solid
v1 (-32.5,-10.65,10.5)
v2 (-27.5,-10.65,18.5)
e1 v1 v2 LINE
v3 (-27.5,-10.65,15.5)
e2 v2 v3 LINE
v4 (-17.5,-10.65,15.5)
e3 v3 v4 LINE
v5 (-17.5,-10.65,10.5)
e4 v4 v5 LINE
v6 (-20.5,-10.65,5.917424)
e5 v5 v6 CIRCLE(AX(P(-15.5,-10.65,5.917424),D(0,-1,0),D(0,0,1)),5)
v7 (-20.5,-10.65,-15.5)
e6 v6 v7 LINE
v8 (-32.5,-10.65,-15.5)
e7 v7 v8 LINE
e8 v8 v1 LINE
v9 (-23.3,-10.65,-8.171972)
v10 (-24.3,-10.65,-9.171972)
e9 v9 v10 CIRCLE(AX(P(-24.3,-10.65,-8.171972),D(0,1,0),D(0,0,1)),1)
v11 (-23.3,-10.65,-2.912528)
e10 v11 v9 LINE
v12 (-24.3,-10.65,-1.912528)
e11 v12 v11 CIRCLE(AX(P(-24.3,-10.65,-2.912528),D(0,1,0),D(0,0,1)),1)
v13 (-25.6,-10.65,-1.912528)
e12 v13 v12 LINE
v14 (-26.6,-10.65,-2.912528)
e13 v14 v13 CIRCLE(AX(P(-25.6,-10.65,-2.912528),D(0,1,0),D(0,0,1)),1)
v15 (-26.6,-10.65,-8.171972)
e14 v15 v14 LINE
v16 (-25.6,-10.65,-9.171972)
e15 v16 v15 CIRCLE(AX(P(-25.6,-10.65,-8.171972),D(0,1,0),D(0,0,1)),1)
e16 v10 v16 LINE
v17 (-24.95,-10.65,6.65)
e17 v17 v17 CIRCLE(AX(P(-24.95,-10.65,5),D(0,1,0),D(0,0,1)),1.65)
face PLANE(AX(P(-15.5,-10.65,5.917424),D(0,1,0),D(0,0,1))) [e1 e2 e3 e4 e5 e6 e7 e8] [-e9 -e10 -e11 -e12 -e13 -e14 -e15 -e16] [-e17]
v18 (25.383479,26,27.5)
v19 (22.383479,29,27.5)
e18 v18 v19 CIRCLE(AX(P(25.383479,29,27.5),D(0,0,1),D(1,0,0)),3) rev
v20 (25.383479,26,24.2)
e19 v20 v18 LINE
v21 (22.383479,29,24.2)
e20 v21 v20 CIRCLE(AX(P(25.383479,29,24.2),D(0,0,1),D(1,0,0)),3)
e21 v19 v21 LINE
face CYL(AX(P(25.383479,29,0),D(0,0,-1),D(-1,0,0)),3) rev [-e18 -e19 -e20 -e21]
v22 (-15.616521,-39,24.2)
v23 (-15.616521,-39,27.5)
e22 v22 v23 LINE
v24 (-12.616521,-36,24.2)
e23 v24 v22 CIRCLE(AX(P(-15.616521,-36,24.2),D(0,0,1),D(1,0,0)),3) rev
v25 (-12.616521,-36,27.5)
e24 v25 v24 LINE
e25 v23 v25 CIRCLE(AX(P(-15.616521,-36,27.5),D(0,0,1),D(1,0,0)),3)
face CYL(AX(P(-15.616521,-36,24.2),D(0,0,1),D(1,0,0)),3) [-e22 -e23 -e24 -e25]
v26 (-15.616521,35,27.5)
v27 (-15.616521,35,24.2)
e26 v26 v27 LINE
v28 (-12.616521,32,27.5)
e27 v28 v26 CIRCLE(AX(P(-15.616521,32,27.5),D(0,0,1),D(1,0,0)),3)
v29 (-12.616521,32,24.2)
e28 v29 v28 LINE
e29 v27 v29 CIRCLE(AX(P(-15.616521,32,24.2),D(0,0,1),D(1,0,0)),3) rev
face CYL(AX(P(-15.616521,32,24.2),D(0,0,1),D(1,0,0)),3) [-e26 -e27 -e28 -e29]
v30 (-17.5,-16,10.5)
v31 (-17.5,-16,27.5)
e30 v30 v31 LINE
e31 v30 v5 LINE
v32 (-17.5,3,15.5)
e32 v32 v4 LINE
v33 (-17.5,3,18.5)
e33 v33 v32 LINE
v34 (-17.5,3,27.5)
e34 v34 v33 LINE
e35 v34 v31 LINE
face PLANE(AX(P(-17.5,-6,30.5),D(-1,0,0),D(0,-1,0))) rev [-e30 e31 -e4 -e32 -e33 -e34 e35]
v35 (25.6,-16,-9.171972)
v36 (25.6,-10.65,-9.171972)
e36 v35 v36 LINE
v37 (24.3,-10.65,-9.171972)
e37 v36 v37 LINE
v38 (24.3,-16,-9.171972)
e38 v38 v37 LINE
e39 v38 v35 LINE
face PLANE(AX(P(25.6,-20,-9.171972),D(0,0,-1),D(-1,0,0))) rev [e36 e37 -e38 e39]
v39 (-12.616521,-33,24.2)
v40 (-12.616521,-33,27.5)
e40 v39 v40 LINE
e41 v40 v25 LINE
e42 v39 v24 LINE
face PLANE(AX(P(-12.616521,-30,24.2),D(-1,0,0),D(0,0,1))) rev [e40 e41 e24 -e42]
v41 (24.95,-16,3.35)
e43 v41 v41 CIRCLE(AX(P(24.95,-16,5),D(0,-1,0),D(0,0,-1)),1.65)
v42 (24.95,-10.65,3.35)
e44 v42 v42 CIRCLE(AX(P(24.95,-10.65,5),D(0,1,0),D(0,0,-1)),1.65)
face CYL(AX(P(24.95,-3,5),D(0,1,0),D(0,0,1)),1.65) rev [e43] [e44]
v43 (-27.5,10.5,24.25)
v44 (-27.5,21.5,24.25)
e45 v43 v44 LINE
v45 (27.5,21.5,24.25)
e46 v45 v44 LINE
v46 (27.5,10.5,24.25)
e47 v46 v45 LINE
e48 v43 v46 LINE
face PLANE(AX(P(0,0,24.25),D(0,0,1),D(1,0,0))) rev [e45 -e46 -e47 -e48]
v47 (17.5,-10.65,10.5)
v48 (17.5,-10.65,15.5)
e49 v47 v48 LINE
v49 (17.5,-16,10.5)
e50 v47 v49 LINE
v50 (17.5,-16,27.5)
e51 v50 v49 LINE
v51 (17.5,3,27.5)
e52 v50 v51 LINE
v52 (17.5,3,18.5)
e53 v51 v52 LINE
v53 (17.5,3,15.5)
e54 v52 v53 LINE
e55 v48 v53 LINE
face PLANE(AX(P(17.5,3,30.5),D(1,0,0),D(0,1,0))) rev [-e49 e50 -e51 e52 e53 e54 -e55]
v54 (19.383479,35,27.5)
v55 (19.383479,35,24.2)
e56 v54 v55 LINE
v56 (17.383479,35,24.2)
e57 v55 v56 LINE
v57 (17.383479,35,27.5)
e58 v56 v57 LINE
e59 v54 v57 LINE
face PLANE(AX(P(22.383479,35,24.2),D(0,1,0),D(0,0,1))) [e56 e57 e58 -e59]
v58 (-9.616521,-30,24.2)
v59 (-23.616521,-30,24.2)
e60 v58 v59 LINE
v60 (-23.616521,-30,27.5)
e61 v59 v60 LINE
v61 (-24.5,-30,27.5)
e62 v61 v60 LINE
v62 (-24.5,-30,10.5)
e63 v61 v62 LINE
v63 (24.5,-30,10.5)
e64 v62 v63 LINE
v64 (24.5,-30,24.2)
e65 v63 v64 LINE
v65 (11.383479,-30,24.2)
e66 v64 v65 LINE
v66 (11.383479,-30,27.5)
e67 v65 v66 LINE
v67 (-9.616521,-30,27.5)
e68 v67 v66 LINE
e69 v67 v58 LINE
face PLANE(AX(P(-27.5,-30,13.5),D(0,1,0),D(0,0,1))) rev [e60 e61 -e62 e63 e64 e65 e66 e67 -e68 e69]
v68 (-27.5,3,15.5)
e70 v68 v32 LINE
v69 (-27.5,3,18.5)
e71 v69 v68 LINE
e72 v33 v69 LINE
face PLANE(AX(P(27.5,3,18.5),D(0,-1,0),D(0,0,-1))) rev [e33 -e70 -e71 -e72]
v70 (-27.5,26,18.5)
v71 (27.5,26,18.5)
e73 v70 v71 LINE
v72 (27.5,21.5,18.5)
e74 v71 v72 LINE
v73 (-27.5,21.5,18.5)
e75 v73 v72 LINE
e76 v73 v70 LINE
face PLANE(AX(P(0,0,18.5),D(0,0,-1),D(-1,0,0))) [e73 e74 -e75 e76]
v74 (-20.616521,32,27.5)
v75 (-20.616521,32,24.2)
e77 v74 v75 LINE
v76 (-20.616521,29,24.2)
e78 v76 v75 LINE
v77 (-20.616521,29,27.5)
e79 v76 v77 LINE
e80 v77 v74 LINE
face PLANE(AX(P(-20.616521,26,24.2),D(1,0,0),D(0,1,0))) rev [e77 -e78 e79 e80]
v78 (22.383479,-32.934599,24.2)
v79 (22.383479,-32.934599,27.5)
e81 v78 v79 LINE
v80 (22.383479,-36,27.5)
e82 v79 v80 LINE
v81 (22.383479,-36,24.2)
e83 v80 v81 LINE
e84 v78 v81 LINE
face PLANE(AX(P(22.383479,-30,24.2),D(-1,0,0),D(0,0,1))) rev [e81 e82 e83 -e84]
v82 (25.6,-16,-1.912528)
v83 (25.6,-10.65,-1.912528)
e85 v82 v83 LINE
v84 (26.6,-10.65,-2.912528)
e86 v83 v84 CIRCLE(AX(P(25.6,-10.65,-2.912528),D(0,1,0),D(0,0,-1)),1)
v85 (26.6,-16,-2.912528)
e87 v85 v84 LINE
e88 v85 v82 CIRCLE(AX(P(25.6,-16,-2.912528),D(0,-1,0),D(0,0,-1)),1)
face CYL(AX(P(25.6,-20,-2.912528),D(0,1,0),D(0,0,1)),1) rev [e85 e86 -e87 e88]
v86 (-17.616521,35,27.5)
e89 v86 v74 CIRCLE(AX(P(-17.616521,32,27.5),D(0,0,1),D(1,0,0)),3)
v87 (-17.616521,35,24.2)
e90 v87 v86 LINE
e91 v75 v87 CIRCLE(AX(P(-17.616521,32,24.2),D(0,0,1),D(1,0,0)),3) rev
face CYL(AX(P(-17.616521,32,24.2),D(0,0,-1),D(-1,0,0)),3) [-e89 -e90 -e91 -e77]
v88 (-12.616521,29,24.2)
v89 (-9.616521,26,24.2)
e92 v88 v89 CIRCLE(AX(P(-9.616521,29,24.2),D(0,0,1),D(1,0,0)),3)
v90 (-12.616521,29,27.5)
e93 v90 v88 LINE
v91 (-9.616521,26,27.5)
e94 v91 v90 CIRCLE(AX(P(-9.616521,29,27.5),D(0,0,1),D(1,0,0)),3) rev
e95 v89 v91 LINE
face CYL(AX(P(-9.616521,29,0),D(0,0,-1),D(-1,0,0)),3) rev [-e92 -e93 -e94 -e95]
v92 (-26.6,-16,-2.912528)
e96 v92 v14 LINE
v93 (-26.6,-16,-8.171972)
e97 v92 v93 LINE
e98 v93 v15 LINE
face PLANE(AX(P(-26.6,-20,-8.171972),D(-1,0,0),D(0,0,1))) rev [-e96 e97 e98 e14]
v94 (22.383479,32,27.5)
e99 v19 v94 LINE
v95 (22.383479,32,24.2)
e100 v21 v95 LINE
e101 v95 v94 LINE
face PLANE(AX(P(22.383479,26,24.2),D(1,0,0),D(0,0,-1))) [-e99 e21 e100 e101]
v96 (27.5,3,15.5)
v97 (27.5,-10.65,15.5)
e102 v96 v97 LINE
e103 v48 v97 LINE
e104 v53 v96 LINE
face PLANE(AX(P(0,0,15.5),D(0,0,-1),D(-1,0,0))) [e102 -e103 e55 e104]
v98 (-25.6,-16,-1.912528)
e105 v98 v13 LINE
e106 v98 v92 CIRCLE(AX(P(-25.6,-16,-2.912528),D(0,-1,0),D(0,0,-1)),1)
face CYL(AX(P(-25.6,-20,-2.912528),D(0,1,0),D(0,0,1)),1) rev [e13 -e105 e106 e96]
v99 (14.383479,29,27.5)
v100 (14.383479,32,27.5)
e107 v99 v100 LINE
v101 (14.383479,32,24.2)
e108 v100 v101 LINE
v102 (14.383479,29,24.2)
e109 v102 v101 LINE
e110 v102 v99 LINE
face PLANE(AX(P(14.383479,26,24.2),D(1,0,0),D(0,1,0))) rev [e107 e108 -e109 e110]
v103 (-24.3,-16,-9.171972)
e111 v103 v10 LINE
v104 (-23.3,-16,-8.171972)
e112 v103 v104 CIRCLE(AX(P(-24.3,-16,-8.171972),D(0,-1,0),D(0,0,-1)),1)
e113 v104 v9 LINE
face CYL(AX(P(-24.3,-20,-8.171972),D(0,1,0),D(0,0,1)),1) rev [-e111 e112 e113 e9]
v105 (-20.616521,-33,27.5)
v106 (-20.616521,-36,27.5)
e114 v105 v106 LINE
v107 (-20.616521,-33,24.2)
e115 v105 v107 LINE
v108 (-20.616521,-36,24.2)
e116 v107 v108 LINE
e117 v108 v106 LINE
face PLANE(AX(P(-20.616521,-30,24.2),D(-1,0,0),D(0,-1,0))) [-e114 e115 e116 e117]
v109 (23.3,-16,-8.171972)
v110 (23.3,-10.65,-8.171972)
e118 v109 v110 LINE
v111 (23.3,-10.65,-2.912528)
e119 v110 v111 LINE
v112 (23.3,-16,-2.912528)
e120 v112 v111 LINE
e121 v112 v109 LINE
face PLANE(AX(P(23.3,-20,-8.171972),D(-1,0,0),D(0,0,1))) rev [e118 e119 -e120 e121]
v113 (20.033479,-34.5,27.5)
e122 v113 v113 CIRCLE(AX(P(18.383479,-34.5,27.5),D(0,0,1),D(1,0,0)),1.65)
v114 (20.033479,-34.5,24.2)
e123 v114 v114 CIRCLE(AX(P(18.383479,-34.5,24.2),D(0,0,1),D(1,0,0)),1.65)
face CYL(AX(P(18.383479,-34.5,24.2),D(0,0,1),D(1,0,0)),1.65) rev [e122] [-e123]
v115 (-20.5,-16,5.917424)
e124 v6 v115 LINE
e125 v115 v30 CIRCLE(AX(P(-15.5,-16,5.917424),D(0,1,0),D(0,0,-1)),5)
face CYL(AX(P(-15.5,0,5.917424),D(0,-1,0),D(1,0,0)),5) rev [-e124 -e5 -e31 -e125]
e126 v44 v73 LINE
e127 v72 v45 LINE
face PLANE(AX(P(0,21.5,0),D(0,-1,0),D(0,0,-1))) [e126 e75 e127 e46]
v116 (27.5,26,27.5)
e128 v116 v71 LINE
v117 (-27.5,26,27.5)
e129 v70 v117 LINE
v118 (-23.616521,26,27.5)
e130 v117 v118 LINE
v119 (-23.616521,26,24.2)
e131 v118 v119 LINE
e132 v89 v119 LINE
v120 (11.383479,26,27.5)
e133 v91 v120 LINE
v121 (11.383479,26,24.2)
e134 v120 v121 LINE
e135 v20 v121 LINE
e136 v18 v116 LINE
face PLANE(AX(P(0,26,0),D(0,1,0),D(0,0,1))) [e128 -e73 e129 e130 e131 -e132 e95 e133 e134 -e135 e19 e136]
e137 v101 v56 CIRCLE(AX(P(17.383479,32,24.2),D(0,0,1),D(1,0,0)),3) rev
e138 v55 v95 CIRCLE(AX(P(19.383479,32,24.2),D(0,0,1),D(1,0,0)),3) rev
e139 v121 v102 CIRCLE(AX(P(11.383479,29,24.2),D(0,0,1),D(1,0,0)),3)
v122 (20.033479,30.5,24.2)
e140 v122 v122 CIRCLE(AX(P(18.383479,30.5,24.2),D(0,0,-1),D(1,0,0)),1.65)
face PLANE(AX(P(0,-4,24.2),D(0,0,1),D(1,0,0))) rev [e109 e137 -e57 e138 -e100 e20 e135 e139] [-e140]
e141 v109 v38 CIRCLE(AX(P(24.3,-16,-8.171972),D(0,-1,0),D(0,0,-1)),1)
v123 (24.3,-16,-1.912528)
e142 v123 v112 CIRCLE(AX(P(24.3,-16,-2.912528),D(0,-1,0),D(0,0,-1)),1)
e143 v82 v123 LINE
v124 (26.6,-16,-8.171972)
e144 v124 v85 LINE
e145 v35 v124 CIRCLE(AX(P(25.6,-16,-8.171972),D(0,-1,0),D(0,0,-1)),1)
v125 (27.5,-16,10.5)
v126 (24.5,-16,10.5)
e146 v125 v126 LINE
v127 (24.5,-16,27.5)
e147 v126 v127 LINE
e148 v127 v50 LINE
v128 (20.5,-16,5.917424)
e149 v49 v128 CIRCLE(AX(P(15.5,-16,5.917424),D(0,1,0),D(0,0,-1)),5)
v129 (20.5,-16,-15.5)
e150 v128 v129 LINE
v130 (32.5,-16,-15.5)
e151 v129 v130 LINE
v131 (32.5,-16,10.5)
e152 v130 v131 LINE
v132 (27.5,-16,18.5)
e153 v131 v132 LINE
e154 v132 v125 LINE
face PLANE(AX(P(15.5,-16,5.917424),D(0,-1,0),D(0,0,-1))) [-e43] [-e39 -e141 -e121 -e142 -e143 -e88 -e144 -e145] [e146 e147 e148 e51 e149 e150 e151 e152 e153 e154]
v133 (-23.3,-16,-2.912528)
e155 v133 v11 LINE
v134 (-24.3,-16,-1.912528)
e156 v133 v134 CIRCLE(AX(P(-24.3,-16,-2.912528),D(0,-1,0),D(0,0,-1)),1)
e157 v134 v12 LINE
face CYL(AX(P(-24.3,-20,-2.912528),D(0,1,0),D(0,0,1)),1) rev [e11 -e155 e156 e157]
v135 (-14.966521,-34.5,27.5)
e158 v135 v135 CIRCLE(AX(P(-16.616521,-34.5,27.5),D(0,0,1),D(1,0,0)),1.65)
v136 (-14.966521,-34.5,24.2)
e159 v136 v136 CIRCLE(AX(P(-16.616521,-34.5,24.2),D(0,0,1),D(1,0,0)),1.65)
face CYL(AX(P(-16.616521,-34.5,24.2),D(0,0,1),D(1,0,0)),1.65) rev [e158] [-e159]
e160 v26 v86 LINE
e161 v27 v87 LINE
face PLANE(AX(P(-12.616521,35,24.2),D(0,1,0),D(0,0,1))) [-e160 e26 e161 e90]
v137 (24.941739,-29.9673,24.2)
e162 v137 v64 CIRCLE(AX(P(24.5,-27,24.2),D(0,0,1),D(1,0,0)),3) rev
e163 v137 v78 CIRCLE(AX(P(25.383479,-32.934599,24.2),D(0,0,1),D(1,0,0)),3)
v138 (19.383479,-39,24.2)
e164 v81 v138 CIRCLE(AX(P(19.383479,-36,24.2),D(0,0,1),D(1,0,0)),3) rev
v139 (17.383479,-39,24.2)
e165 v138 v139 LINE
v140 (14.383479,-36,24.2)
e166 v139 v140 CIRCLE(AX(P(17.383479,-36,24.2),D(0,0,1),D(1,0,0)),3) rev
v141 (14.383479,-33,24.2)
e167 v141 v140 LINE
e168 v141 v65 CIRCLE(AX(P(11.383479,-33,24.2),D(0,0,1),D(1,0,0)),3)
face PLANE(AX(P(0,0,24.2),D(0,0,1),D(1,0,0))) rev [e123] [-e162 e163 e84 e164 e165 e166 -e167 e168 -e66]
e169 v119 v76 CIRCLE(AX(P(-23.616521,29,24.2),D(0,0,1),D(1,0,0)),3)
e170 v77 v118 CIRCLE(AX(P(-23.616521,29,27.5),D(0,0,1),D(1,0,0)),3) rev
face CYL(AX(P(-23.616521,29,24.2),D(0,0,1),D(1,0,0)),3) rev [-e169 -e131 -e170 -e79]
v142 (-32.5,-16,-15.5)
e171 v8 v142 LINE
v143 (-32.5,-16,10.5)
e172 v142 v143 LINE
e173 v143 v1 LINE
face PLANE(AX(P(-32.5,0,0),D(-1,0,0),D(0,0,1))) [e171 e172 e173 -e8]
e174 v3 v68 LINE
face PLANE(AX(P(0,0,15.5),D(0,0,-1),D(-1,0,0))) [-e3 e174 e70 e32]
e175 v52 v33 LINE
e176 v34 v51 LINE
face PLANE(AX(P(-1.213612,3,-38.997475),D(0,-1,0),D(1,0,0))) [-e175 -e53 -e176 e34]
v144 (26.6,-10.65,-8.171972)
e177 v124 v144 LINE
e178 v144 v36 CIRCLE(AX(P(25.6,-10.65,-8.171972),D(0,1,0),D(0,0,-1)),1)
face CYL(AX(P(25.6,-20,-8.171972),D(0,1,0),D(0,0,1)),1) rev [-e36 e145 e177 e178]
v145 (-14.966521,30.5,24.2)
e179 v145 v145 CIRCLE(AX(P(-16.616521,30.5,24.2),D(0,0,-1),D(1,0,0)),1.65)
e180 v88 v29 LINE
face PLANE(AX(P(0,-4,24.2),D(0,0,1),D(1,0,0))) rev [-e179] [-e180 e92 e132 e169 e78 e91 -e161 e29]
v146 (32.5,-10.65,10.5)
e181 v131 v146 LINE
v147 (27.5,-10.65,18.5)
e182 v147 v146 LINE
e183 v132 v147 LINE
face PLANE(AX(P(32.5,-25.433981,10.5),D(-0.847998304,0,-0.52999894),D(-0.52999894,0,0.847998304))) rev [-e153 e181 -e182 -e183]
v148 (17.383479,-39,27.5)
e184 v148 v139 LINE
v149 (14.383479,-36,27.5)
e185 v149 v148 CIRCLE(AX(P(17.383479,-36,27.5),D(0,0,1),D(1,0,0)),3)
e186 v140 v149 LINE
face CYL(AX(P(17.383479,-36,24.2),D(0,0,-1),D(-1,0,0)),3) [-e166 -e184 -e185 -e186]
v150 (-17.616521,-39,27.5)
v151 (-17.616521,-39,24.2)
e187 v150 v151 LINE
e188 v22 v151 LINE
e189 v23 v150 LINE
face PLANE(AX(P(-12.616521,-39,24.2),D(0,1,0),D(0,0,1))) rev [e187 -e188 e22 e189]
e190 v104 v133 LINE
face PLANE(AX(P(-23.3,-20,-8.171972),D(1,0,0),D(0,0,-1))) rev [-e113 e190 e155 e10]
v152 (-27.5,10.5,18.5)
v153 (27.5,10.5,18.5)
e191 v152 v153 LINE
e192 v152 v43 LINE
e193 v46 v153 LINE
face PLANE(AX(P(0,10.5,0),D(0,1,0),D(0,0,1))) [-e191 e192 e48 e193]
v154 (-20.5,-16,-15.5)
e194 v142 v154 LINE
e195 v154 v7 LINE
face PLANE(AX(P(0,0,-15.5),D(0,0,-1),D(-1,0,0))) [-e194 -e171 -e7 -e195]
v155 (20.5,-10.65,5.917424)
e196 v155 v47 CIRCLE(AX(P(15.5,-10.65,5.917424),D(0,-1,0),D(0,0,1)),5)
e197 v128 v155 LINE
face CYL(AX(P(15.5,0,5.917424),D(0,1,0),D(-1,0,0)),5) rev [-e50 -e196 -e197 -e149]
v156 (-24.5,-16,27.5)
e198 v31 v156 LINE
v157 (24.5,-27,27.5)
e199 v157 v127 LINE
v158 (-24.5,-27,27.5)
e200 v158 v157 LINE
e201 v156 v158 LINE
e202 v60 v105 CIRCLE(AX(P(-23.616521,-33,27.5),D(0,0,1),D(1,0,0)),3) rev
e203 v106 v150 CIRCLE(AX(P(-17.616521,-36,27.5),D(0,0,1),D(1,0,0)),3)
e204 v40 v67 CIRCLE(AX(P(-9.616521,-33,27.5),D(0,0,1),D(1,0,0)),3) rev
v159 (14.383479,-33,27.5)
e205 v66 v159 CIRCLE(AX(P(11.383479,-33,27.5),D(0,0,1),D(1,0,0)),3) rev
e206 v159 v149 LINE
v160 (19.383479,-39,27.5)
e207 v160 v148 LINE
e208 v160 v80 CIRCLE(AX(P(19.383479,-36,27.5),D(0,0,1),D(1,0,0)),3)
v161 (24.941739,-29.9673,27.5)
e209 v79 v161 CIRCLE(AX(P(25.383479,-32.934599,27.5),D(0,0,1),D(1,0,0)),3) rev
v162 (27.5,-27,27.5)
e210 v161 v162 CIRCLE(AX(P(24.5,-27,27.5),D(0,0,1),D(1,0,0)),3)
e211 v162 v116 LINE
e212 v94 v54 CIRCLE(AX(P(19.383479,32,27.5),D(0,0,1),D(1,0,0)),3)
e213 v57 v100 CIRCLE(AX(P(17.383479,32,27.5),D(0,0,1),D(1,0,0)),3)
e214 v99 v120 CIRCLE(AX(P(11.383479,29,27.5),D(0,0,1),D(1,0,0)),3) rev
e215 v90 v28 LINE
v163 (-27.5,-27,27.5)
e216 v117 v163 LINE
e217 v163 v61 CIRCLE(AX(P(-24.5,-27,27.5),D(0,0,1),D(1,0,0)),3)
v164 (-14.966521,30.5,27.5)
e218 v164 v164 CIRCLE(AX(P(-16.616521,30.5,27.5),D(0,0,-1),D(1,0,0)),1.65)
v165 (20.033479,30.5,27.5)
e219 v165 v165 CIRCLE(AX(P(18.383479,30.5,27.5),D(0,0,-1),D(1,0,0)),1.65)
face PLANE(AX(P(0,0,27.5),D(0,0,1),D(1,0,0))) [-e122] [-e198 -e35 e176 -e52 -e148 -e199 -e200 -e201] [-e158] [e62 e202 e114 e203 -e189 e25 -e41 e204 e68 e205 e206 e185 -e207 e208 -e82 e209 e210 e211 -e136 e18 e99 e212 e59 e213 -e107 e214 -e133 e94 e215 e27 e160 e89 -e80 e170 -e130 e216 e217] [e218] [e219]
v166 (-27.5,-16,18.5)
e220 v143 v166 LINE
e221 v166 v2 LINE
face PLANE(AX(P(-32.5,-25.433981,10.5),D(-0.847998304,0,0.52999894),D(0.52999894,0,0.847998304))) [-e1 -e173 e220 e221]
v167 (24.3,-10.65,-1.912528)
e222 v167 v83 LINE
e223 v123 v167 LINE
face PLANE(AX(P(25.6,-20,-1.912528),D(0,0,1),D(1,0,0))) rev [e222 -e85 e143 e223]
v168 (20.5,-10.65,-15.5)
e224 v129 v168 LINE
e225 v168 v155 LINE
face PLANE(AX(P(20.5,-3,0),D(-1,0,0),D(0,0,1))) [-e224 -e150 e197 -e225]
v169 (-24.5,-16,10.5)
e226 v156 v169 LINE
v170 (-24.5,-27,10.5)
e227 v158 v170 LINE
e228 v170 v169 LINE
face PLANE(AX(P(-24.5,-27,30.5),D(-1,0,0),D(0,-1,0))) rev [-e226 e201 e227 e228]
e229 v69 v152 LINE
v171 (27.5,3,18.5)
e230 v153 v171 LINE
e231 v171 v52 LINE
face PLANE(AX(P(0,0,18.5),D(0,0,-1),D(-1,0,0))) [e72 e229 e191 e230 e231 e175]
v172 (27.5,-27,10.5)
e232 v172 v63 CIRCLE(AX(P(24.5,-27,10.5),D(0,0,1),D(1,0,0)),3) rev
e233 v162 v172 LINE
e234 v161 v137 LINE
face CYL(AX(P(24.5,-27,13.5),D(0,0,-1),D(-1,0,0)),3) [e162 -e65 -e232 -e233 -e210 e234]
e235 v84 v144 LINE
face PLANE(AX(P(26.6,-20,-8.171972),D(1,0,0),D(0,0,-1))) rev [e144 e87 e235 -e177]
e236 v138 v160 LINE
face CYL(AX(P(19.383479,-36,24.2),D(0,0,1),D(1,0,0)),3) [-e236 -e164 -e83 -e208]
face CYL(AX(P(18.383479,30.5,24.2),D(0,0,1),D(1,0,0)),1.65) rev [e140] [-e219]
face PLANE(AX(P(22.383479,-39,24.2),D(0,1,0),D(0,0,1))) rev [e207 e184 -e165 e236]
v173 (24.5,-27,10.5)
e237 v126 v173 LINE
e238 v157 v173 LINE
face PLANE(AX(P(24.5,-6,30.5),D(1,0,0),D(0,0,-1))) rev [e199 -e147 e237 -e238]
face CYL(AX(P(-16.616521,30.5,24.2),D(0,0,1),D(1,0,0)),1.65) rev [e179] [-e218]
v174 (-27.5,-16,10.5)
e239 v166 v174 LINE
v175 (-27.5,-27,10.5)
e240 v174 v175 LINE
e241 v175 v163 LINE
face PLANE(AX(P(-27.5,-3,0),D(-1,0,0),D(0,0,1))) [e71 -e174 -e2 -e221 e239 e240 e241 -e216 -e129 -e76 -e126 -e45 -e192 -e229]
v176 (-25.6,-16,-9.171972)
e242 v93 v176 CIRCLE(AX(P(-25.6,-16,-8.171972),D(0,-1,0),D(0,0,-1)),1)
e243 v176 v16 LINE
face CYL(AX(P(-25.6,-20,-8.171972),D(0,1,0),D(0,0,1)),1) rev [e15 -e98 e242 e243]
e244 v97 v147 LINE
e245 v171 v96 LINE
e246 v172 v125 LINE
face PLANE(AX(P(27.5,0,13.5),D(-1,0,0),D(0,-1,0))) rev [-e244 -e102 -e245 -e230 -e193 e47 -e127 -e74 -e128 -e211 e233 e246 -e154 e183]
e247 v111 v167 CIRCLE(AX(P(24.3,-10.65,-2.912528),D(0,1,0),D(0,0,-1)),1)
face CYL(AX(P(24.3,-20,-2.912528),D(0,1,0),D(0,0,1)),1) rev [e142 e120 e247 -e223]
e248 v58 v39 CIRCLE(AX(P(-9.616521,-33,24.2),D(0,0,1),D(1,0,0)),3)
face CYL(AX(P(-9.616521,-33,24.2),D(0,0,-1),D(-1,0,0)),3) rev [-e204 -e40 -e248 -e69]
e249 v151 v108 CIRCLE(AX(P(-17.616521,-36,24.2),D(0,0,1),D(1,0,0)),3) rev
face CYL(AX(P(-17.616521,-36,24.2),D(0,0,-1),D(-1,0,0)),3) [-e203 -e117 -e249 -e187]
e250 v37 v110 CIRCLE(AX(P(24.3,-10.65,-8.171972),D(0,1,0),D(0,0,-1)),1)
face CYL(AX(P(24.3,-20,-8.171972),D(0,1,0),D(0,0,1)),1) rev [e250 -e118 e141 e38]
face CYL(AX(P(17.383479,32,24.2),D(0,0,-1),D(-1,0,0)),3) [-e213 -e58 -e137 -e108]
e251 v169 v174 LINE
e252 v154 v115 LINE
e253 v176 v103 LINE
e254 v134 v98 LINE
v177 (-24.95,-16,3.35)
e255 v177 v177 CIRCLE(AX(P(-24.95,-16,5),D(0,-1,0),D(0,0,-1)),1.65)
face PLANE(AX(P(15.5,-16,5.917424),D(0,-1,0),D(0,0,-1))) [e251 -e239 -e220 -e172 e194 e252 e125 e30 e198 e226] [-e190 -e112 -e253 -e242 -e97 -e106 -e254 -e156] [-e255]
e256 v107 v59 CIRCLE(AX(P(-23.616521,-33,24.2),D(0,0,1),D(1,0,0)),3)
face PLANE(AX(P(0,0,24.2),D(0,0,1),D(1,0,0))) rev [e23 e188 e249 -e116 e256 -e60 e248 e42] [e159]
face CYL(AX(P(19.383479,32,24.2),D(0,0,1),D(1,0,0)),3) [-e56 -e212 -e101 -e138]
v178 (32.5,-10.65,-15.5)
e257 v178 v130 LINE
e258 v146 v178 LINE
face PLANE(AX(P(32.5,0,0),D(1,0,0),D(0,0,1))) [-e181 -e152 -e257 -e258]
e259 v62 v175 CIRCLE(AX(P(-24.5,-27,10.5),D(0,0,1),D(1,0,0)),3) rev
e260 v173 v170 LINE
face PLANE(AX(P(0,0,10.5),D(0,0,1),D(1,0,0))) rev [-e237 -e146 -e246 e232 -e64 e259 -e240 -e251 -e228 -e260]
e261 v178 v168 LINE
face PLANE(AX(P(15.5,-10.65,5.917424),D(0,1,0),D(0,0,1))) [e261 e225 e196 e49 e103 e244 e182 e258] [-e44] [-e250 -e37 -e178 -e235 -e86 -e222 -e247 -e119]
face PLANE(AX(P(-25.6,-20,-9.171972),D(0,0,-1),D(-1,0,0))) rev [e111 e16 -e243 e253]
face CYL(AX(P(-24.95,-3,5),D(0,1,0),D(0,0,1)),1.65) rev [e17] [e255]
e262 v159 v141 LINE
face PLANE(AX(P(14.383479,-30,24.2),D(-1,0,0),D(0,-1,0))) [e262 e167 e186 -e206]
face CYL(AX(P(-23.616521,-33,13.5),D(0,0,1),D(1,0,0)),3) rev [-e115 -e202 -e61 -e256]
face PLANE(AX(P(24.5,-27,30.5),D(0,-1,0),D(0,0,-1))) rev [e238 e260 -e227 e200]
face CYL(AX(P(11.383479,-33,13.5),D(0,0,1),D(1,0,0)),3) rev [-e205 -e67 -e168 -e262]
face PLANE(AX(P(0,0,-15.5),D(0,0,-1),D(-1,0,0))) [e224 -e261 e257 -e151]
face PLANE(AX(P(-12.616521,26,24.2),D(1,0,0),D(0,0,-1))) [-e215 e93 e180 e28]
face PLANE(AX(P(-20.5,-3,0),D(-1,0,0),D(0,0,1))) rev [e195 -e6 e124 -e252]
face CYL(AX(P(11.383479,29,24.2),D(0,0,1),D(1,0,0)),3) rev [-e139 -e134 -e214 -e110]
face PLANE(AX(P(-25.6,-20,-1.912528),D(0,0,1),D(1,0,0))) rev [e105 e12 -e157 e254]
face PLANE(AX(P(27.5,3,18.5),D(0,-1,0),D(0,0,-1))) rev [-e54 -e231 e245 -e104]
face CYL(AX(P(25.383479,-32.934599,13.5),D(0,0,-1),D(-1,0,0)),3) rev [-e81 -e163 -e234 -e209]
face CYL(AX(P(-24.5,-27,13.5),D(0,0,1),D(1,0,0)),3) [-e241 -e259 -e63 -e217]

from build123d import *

# Parameters (mm, degrees)
SKETCH_1_W           = 7
SKETCH_1_H           = 21
SKETCH_1_R           = 1.65
EXTRUDE_1_DEPTH      = 3
EXTRUDE_1_2_DEPTH    = 3
SKETCH_2_W           = 55
SKETCH_2_H           = 30
EXTRUDE_2_DEPTH      = 3
SKETCH_3_W           = 55
SKETCH_3_H           = 30
EXTRUDE_3_DEPTH      = 14
SKETCH_4_W           = 55
SKETCH_4_H           = 17
EXTRUDE_4_DEPTH      = 22
SKETCH_5_W           = 66.735039671
SKETCH_5_H           = 6
CUT_EXTRUDE_1_DEPTH  = 13.75
CUT_EXTRUDE_2_DEPTH  = 20
SKETCH2_W            = 7
SKETCH2_H            = 21
SKETCH2_R            = 1.65
BOSS_EXTRUDE1_DEPTH  = 3
SKETCH3_W            = 7
SKETCH3_H            = 6
BOSS_EXTRUDE2_DEPTH  = 5
SKETCH4_W            = 3
SKETCH4_H            = 6
BOSS_EXTRUDE3_DEPTH  = 41
SKETCH5_W            = 8
SKETCH5_H            = 9
SKETCH5_R            = 1.65
BOSS_EXTRUDE4_DEPTH  = 3.3
FILLET1_R            = 5
FILLET2_R            = 3
FILLET3_R            = 3
SKETCH6_W            = 55
SKETCH6_H            = 17
BOSS_EXTRUDE5_DEPTH  = 4
MIRROR2_START        = 24.2
MIRROR2_OUTLINE_R    = 1.65
MIRROR2_DEPTH        = 3.3
FILLET4_R            = 3
SKETCH8_W            = 55
SKETCH8_H            = 7
CUT_EXTRUDE1_DEPTH   = 8
SKETCH10_R           = 1.65
BOSS_EXTRUDE6_DEPTH  = 10
CUT_EXTRUDE2_DEPTH   = 10
SKETCH12_W           = 55
SKETCH12_H           = 13.75
CUT_EXTRUDE3_DEPTH   = 2.5
CUT_EXTRUDE4_DEPTH   = 10
SKETCH15_W           = 41
SKETCH15_H           = 3
CUT_EXTRUDE5_DEPTH   = 60.476886267
SKETCH17_W           = 55
SKETCH17_H           = 5.75
CUT_EXTRUDE6_DEPTH   = 2.5
BOSS_EXTRUDE8_DEPTH  = 17
SKETCH19_W           = 55
SKETCH19_H           = 7.5
CUT_EXTRUDE8_DEPTH   = 8
SKETCH20_W           = 10
SKETCH20_H           = 13
CUT_EXTRUDE9_DEPTH   = 5
SKETCH16_W           = 26
SKETCH16_H           = 6
BOSS_EXTRUDE9_DEPTH  = 5
BOSS_EXTRUDE10_DEPTH = 6
SKETCH23_R           = 1.65
CUT_EXTRUDE10_DEPTH  = 0.65


# Read off the part's stored shape, not the designer's step: Mirror2
with BuildPart() as part:
    # 草图1 → 凸台-拉伸1 (new body)
    with BuildSketch(Plane(origin=(0, 0, 0), x_dir=(1, 0, 0), z_dir=(0, 1, 0))):
        with Locations((-24, 0)):
            Rectangle(SKETCH_1_W, SKETCH_1_H)
        with Locations(Location((-24.95, -5, 0), (0, 0, 270))):
            Circle(SKETCH_1_R, mode=Mode.SUBTRACT)
        with Locations(Location((-24.95, 5, 0), (0, 0, 270))):
            Circle(SKETCH_1_R, mode=Mode.SUBTRACT)
    extrude(amount=-EXTRUDE_1_DEPTH)



with BuildPart() as body_2:
    # 草图1 → Extrude 1 2 (new body)
    with BuildSketch(Plane(origin=(0, 0, 0), x_dir=(1, 0, 0), z_dir=(0, 1, 0))):
        with Locations((24, 0)):
            Rectangle(SKETCH_1_W, SKETCH_1_H)
        with Locations(Location((24.95, -5, 0), (0, 0, 270))):
            Circle(SKETCH_1_R, mode=Mode.SUBTRACT)
        with Locations(Location((24.95, 5, 0), (0, 0, 270))):
            Circle(SKETCH_1_R, mode=Mode.SUBTRACT)
    extrude(amount=-EXTRUDE_1_2_DEPTH)


with BuildPart() as part_1:
    add(part.part)

    add(body_2.part)  # 凸台-拉伸2 merges body 2
    # 草图2 → 凸台-拉伸2 (add)
    with BuildSketch(Plane.XY.offset(10.5)):
        with Locations((0, -15)):
            Rectangle(SKETCH_2_W, SKETCH_2_H)
    extrude(amount=EXTRUDE_2_DEPTH)

    # 草图3 → 凸台-拉伸3 (add)
    with BuildSketch(Plane.XY.offset(13.5)):
        with Locations((0, -15)):
            Rectangle(SKETCH_3_W, SKETCH_3_H)
    extrude(amount=EXTRUDE_3_DEPTH)

    # 草图4 → 凸台-拉伸4 (add)
    with BuildSketch(Plane(origin=(0, 0, 0), x_dir=(1, 0, 0), z_dir=(0, 1, 0))):
        with Locations((0, -19)):
            Rectangle(SKETCH_4_W, SKETCH_4_H)
    extrude(amount=EXTRUDE_4_DEPTH)

    # 草图5 → 切除-拉伸1 (cut)
    with BuildSketch(Plane(origin=(0, 0, 10.5), x_dir=(-1, 0, 0), z_dir=(0, 0, -1))):
        with Locations((1.017100612, 16)):
            Rectangle(SKETCH_5_W, SKETCH_5_H)
    extrude(amount=-CUT_EXTRUDE_1_DEPTH, mode=Mode.SUBTRACT)

    # 草图6 → 切除-拉伸2 (cut)
    with BuildSketch(Plane(origin=(0, 0, 10.5), x_dir=(-1, 0, 0), z_dir=(0, 0, -1))):
        Polygon((-24.5, 3), (-17.5, 3), (-17.5, -6), (-24.5, -6), (-24.5, -27), (24.5, -27), (24.5, -6), (17.5, -6), (17.5, 3), (24.5, 3), (24.5, 10), (-24.5, 10), align=None)
    extrude(amount=-CUT_EXTRUDE_2_DEPTH, mode=Mode.SUBTRACT)

    # Sketch2 → Boss-Extrude1 (add)
    # profile 1 of 2: a face of its own
    with BuildSketch(Plane.XZ.offset(3)):
        with Locations((24, 0)):
            Rectangle(SKETCH2_W, SKETCH2_H)
        with Locations(Location((24.95, -5, 0), (0, 0, 90))):
            Circle(SKETCH2_R, mode=Mode.SUBTRACT)
        with Locations(Location((24.95, 5, 0), (0, 0, 90))):
            Circle(SKETCH2_R, mode=Mode.SUBTRACT)
    # profile 2 of 2: a face of its own
    with BuildSketch(Plane.XZ.offset(3)):
        with Locations((-24, 0)):
            Rectangle(SKETCH2_W, SKETCH2_H)
        with Locations(Location((-24.95, -5, 0), (0, 0, 90))):
            Circle(SKETCH2_R, mode=Mode.SUBTRACT)
        with Locations(Location((-24.95, 5, 0), (0, 0, 90))):
            Circle(SKETCH2_R, mode=Mode.SUBTRACT)
    extrude(amount=BOSS_EXTRUDE1_DEPTH)

    # Sketch3 → Boss-Extrude2 (add)
    with BuildSketch(Plane(origin=(0, 0, -10.5), x_dir=(-1, 0, 0), z_dir=(0, 0, -1))):
        with Locations((-24, -3)):
            Rectangle(SKETCH3_W, SKETCH3_H)
        with Locations((24, -3)):
            Rectangle(SKETCH3_W, SKETCH3_H)
    extrude(amount=BOSS_EXTRUDE2_DEPTH)

    # Sketch4 → Boss-Extrude3 (add)
    with BuildSketch(Plane.ZY.offset(-20.5)):
        with Locations((-14, -3)):
            Rectangle(SKETCH4_W, SKETCH4_H)
    extrude(amount=BOSS_EXTRUDE3_DEPTH)

    # Sketch5 → Boss-Extrude4 (add)
    # profile 1 of 2: a face of its own
    with BuildSketch(Plane.XY.offset(27.5)):
        with Locations((18.383478606, -34.5)):
            Rectangle(SKETCH5_W, SKETCH5_H)
        with Locations((18.383478606, -34.5)):
            Circle(SKETCH5_R, mode=Mode.SUBTRACT)
    # profile 2 of 2: a face of its own
    with BuildSketch(Plane.XY.offset(27.5)):
        with Locations((-16.616521394, -34.5)):
            Rectangle(SKETCH5_W, SKETCH5_H)
        with Locations((-16.616521394, -34.5)):
            Circle(SKETCH5_R, mode=Mode.SUBTRACT)
    extrude(amount=-BOSS_EXTRUDE4_DEPTH)

    # Fillet1
    # the kernel refuses this fillet: 5 mm, written as the material it adds along each edge
    with BuildSketch(Plane(origin=(-20.5, 0, 10.5), x_dir=(1, 0, 0), z_dir=(0, -1, 0)), Plane(origin=(20.5, -6, 10.5), x_dir=(-1, 0, 0), z_dir=(0, 1, 0))) as fillet1_piece_1:
        with BuildLine():
            CenterArc((5, -4.582575695), FILLET1_R, 113.578178478, 66.421821522)
            Line((0, -4.582575695), (-0.1, -4.582575695))
            Line((-0.1, -4.582575695), (-0.1, 0))
            Line((-0.1, 0), (0, 0.1))
            ThreePointArc((0, 0.1), (1.5, 0.1), (2.96, 0.091651514))
            Line((2.96, 0.091651514), (3, 0))
        make_face()
    extrude(amount=6)

    # Fillet2
    fillet2_edges = [part_1.edges().sort_by_distance(p)[0] for p in [
        (24.5, 3, 19),
        (-24.5, 3, 19),
        (-27.5, -30, 19),
        (27.5, -30, 19),
    ]]
    fillet(fillet2_edges, radius=FILLET2_R)

    # Fillet3
    # the kernel refuses this fillet: 3 mm, written as the material it adds along each edge
    with BuildSketch(Plane(origin=(-20.616521394, -30, 27.5), x_dir=(-1, 0, 0), z_dir=(0, 0, -1)), Plane(origin=(14.383478606, -30, 27.5), x_dir=(-1, 0, 0), z_dir=(0, 0, -1))) as fillet3_piece_1:
        with BuildLine():
            CenterArc((FILLET3_R, -FILLET3_R), FILLET3_R, 90, 90)
            Line((0, -FILLET3_R), (0, 0))
            Line((0, 0), (FILLET3_R, 0))
        make_face()
    extrude(amount=3.3)
    with BuildSketch(Plane(origin=(-12.616521394, -30, 27.5), x_dir=(1, 0, 0), z_dir=(0, 0, -1))) as fillet3_piece_2:
        with BuildLine():
            CenterArc((FILLET3_R, FILLET3_R), FILLET3_R, 180, 90)
            Line((0, FILLET3_R), (0, 0))
            Line((0, 0), (FILLET3_R, 0))
        make_face()
    extrude(amount=3.3)
    with BuildSketch(Plane(origin=(22.383478606, -30, 27.5), x_dir=(0.9999183162467798, 0.012781268880858251, 0), z_dir=(0, 0, -1))) as fillet3_piece_3:
        with BuildLine():
            CenterArc((2.96224705, 2.97270312), FILLET3_R, 180.732332704, 81.532613054)
            Line((-0.037507899, 2.934359313), (-0.337483394, 2.930524932))
            Line((-0.337483394, 2.930524932), (-0.299975495, -0.003834381))
            Line((-0.299975495, -0.003834381), (0.003834381, -0.299975495))
            ThreePointArc((0.003834381, -0.299975495), (2.12018289, -0.272923666), (2.518091946, -0.297270312))
            Line((2.518091946, -0.297270312), (2.558469683, 0))
        make_face()
    extrude(amount=3.3)
    # the kernel refuses this fillet: 3 mm, written as the material it takes off along each edge
    with BuildSketch(Plane(origin=(-12.616521394, -39, 35), x_dir=(0, 1, 0), z_dir=(0, 0, -1)), Plane(origin=(-20.616521394, -39, 35), x_dir=(1, 0, 0), z_dir=(0, 0, -1)), Plane(origin=(22.383478606, -39, 35), x_dir=(0, 1, 0), z_dir=(0, 0, -1)), Plane(origin=(14.383478606, -39, 35), x_dir=(1, 0, 0), z_dir=(0, 0, -1))) as fillet3_2_piece_1:
        with BuildLine():
            CenterArc((FILLET3_R, -FILLET3_R), FILLET3_R, 90, 90)
            Line((0, -FILLET3_R), (0, 0))
            Line((0, 0), (FILLET3_R, 0))
        make_face()
    extrude(amount=18.3, mode=Mode.SUBTRACT)

    # Sketch6 → Boss-Extrude5 (add)
    with BuildSketch(Plane(origin=(0, 22, 0), x_dir=(1, 0, 0), z_dir=(0, 1, 0))):
        with Locations((0, -19)):
            Rectangle(SKETCH6_W, SKETCH6_H)
    extrude(amount=BOSS_EXTRUDE5_DEPTH)

    # Mirror2 outline → Mirror2 (add)
    # profile 1 of 2: a face of its own
    with BuildSketch(Plane.XY.offset(MIRROR2_START)):
        with BuildLine():
            Line((14.383478606, 32), (14.383478606, 26))
            Line((14.383478606, 26), (22.383478606, 26))
            Line((22.383478606, 26), (22.383478606, 32))
            ThreePointArc((22.383478606, 32), (21.504798949, 34.121320343), (19.383478606, 35))
            Line((19.383478606, 35), (17.383478606, 35))
            ThreePointArc((17.383478606, 35), (15.262158262, 34.121320344), (14.383478606, 32))
        make_face()
        with Locations((18.383478606, 30.5)):
            Circle(MIRROR2_OUTLINE_R, mode=Mode.SUBTRACT)
    # profile 2 of 2: a face of its own
    with BuildSketch(Plane.XY.offset(MIRROR2_START)):
        with BuildLine():
            Line((-20.616521394, 26), (-12.616521394, 26))
            Line((-12.616521394, 26), (-12.616521394, 32))
            ThreePointArc((-12.616521394, 32), (-13.495201051, 34.121320343), (-15.616521394, 35))
            Line((-15.616521394, 35), (-17.616521394, 35))
            ThreePointArc((-17.616521394, 35), (-19.737841738, 34.121320344), (-20.616521394, 32))
            Line((-20.616521394, 32), (-20.616521394, 26))
        make_face()
        with Locations((-16.616521394, 30.5)):
            Circle(MIRROR2_OUTLINE_R, mode=Mode.SUBTRACT)
    extrude(amount=MIRROR2_DEPTH)

    # Fillet4
    fillet4_edges = [part_1.edges().sort_by_distance(p)[0] for p in [
        (-12.616521394, 26, 25.85),
        (-20.616521394, 26, 25.85),
        (22.383478606, 26, 25.85),
        (14.383478606, 26, 25.85),
    ]]
    fillet(fillet4_edges, radius=FILLET4_R)

    # Sketch8 → Cut-Extrude1 (cut)
    with BuildSketch(Plane(origin=(0, 0, 10.5), x_dir=(-1, 0, 0), z_dir=(0, 0, -1))):
        with Locations((0, 22.5)):
            Rectangle(SKETCH8_W, SKETCH8_H)
    extrude(amount=-CUT_EXTRUDE1_DEPTH, mode=Mode.SUBTRACT)

    # Sketch10 → Boss-Extrude6 (add)
    with BuildSketch(Plane.XZ.offset(6)):
        with BuildLine():
            Line((-17.5, 27.5), (-24.5, 27.5))
            Line((-24.5, 27.5), (-24.5, 10.5))
            Line((-24.5, 10.5), (-27.5, 10.5))
            Line((-27.5, 10.5), (-27.5, -15.5))
            Line((-27.5, -15.5), (27.5, -15.5))
            Line((27.5, -15.5), (27.5, 10.5))
            Line((27.5, 10.5), (24.5, 10.5))
            Line((24.5, 10.5), (24.5, 27.5))
            Line((24.5, 27.5), (17.5, 27.5))
            Line((17.5, 27.5), (17.5, 10.5))
            ThreePointArc((17.5, 10.5), (19.683300133, 8.656037093), (20.5, 5.917424305))
            Line((20.5, 5.917424305), (20.5, -12.5))
            Line((20.5, -12.5), (-20.5, -12.5))
            Line((-20.5, -12.5), (-20.5, 5.917424305))
            ThreePointArc((-20.5, 5.917424305), (-19.683300133, 8.656037093), (-17.5, 10.5))
            Line((-17.5, 10.5), (-17.5, 27.5))
        make_face()
        with Locations(Location((24.95, -5, 0), (0, 0, 90))):
            Circle(SKETCH10_R, mode=Mode.SUBTRACT)
        with Locations(Location((24.95, 5, 0), (0, 0, 90))):
            Circle(SKETCH10_R, mode=Mode.SUBTRACT)
        with Locations(Location((-24.95, 5, 0), (0, 0, 90))):
            Circle(SKETCH10_R, mode=Mode.SUBTRACT)
        with Locations(Location((-24.95, -5, 0), (0, 0, 90))):
            Circle(SKETCH10_R, mode=Mode.SUBTRACT)
    extrude(amount=BOSS_EXTRUDE6_DEPTH)

    # Sketch11 → Cut-Extrude2 (cut)
    with BuildSketch(Plane(origin=(0, 0, 0), x_dir=(1, 0, 0), z_dir=(0, 1, 0))):
        with BuildLine():
            Line((-27.5, -10.5), (-17.5, -10.5))
            ThreePointArc((-17.5, -10.5), (-19.683300133, -8.656037093), (-20.5, -5.917424305))
            Line((-20.5, -5.917424305), (-20.5, 12.5))
            Line((-20.5, 12.5), (20.5, 12.5))
            Line((20.5, 12.5), (20.5, -5.917424305))
            ThreePointArc((20.5, -5.917424305), (19.683300133, -8.656037093), (17.5, -10.5))
            Line((17.5, -10.5), (27.5, -10.5))
            Line((27.5, -10.5), (27.5, 15.5))
            Line((27.5, 15.5), (-27.5, 15.5))
            Line((-27.5, 15.5), (-27.5, -10.5))
        make_face()
    extrude(amount=-CUT_EXTRUDE2_DEPTH, mode=Mode.SUBTRACT)

    # Sketch12 → Cut-Extrude3 (cut)
    with BuildSketch(Plane(origin=(0, 13, 0), x_dir=(1, 0, 0), z_dir=(0, 1, 0))):
        with Locations((0, -17.375)):
            Rectangle(SKETCH12_W, SKETCH12_H)
    extrude(amount=-CUT_EXTRUDE3_DEPTH, mode=Mode.SUBTRACT)

    # Sketch14 → Cut-Extrude4 (cut)
    with BuildSketch(Plane(origin=(0, -10, 0), x_dir=(1, 0, 0), z_dir=(0, 1, 0))):
        with BuildLine():
            Line((-25.6, 9.171971899), (-24.3, 9.171971899))
            ThreePointArc((-24.3, 9.171971899), (-23.592893219, 8.87907868), (-23.3, 8.171971899))
            Line((-23.3, 8.171971899), (-23.3, 2.912528276))
            ThreePointArc((-23.3, 2.912528276), (-23.592893219, 2.205421495), (-24.3, 1.912528276))
            Line((-24.3, 1.912528276), (-25.6, 1.912528276))
            ThreePointArc((-25.6, 1.912528276), (-26.307106781, 2.205421495), (-26.6, 2.912528276))
            Line((-26.6, 2.912528276), (-26.6, 8.171971899))
            ThreePointArc((-26.6, 8.171971899), (-26.307106781, 8.87907868), (-25.6, 9.171971899))
        make_face()
        with BuildLine():
            Line((23.3, 8.171971899), (23.3, 2.912528276))
            ThreePointArc((23.3, 2.912528276), (23.592893219, 2.205421495), (24.3, 1.912528276))
            Line((24.3, 1.912528276), (25.6, 1.912528276))
            ThreePointArc((25.6, 1.912528276), (26.307106781, 2.205421495), (26.6, 2.912528276))
            Line((26.6, 2.912528276), (26.6, 8.171971899))
            ThreePointArc((26.6, 8.171971899), (26.307106781, 8.87907868), (25.6, 9.171971899))
            Line((25.6, 9.171971899), (24.3, 9.171971899))
            ThreePointArc((24.3, 9.171971899), (23.592893219, 8.87907868), (23.3, 8.171971899))
        make_face()
    extrude(amount=-CUT_EXTRUDE4_DEPTH, mode=Mode.SUBTRACT)

    # Sketch15 → Cut-Extrude5 (cut, through all)
    with BuildSketch(Plane(origin=(0, -10, 0), x_dir=(1, 0, 0), z_dir=(0, 1, 0))):
        with Locations((0, 14)):
            Rectangle(SKETCH15_W, SKETCH15_H)
    extrude(amount=-CUT_EXTRUDE5_DEPTH, mode=Mode.SUBTRACT)

    # Sketch17 → Cut-Extrude6 (cut)
    with BuildSketch(Plane.XZ.offset(-19)):
        with Locations((0, 21.375)):
            Rectangle(SKETCH17_W, SKETCH17_H)
    extrude(amount=-CUT_EXTRUDE6_DEPTH, mode=Mode.SUBTRACT)

    # Sketch18 → Boss-Extrude8 (add)
    with BuildSketch(Plane.XY.offset(27.5)):
        with BuildLine():
            Line((-24.5, 10), (-24.5, 6))
            ThreePointArc((-24.5, 6), (-23.621320344, 3.878679656), (-21.5, 3))
            Line((-21.5, 3), (-17.5, 3))
            Line((-17.5, 3), (-1.213612242, 3))
            Line((-1.213612242, 3), (21.5, 3))
            ThreePointArc((21.5, 3), (23.621320344, 3.878679656), (24.5, 6))
            Line((24.5, 6), (24.5, 10))
            Line((24.5, 10), (-1.213612242, 10))
            Line((-1.213612242, 10), (-24.5, 10))
        make_face()
    extrude(amount=-BOSS_EXTRUDE8_DEPTH)

    # Sketch19 → Cut-Extrude8 (cut)
    with BuildSketch(Plane(origin=(0, 0, 10.5), x_dir=(-1, 0, 0), z_dir=(0, 0, -1))):
        with Locations((0, 6.75)):
            Rectangle(SKETCH19_W, SKETCH19_H)
    extrude(amount=-CUT_EXTRUDE8_DEPTH, mode=Mode.SUBTRACT)

    # Sketch20 → Cut-Extrude9 (cut)
    with BuildSketch(Plane(origin=(0, 0, 10.5), x_dir=(-1, 0, 0), z_dir=(0, 0, -1))):
        with Locations((22.5, -3.5)):
            Rectangle(SKETCH20_W, SKETCH20_H)
        with Locations((-22.5, -3.5)):
            Rectangle(SKETCH20_W, SKETCH20_H)
    extrude(amount=-CUT_EXTRUDE9_DEPTH, mode=Mode.SUBTRACT)

    # Sketch16 → Boss-Extrude9 (add)
    with BuildSketch(Plane.ZY.offset(27.5)):
        with Locations((-2.5, -13)):
            Rectangle(SKETCH16_W, SKETCH16_H)
    boss_extrude9 = extrude(amount=BOSS_EXTRUDE9_DEPTH)

    # Sketch22 → Boss-Extrude10 (add)
    with BuildSketch(Plane(origin=(0, -10, 0), x_dir=(1, 0, 0), z_dir=(0, 1, 0))):
        Polygon((-32.5, -10.5), (-27.5, -18.5), (-27.5, -10.5), align=None)
    boss_extrude10 = extrude(amount=-BOSS_EXTRUDE10_DEPTH)

    # Mirror3: Boss-Extrude9, Boss-Extrude10 across plane
    add(boss_extrude9.mirror(Plane(origin=(0, 0, 0), x_dir=(0, 0, 1), z_dir=(1, 0, 0))))
    add(boss_extrude10.mirror(Plane(origin=(0, 0, 0), x_dir=(0, 0, 1), z_dir=(1, 0, 0))))

    # Sketch23 → Cut-Extrude10 (cut)
    # profile 1 of 2: a face of its own
    with BuildSketch(Plane(origin=(0, -10, 0), x_dir=(1, 0, 0), z_dir=(0, 1, 0))):
        with BuildLine():
            Line((32.5, 15.5), (20.5, 15.5))
            Line((20.5, 15.5), (20.5, -5.917424305))
            ThreePointArc((20.5, -5.917424305), (19.683300133, -8.656037093), (17.5, -10.5))
            Line((17.5, -10.5), (17.5, -15.5))
            Line((17.5, -15.5), (27.5, -15.5))
            Line((27.5, -15.5), (27.5, -18.5))
            Line((27.5, -18.5), (32.5, -10.5))
            Line((32.5, -10.5), (32.5, 15.5))
        make_face()
        with Locations(Location((24.95, -5, 0), (0, 0, 90))):
            Circle(SKETCH23_R, mode=Mode.SUBTRACT)
        with BuildLine():
            Line((25.6, 1.912528276), (24.3, 1.912528276))
            ThreePointArc((24.3, 1.912528276), (23.592893219, 2.205421495), (23.3, 2.912528276))
            Line((23.3, 2.912528276), (23.3, 8.171971899))
            ThreePointArc((23.3, 8.171971899), (23.592893219, 8.87907868), (24.3, 9.171971899))
            Line((24.3, 9.171971899), (25.6, 9.171971899))
            ThreePointArc((25.6, 9.171971899), (26.307106781, 8.87907868), (26.6, 8.171971899))
            Line((26.6, 8.171971899), (26.6, 2.912528276))
            ThreePointArc((26.6, 2.912528276), (26.307106781, 2.205421495), (25.6, 1.912528276))
        make_face(mode=Mode.SUBTRACT)
    # profile 2 of 2: a face of its own
    with BuildSketch(Plane(origin=(0, -10, 0), x_dir=(1, 0, 0), z_dir=(0, 1, 0))):
        with BuildLine():
            Line((-20.5, -5.917424305), (-20.5, 15.5))
            Line((-20.5, 15.5), (-32.5, 15.5))
            Line((-32.5, 15.5), (-32.5, -10.5))
            Line((-32.5, -10.5), (-27.5, -18.5))
            Line((-27.5, -18.5), (-27.5, -15.5))
            Line((-27.5, -15.5), (-17.5, -15.5))
            Line((-17.5, -15.5), (-17.5, -10.5))
            ThreePointArc((-17.5, -10.5), (-19.683300133, -8.656037093), (-20.5, -5.917424305))
        make_face()
        with Locations(Location((-24.95, -5, 0), (0, 0, 270))):
            Circle(SKETCH23_R, mode=Mode.SUBTRACT)
        with BuildLine():
            Line((-24.3, 9.171971899), (-25.6, 9.171971899))
            ThreePointArc((-25.6, 9.171971899), (-26.307106781, 8.87907868), (-26.6, 8.171971899))
            Line((-26.6, 8.171971899), (-26.6, 2.912528276))
            ThreePointArc((-26.6, 2.912528276), (-26.307106781, 2.205421495), (-25.6, 1.912528276))
            Line((-25.6, 1.912528276), (-24.3, 1.912528276))
            ThreePointArc((-24.3, 1.912528276), (-23.592893219, 2.205421495), (-23.3, 2.912528276))
            Line((-23.3, 2.912528276), (-23.3, 8.171971899))
            ThreePointArc((-23.3, 8.171971899), (-23.592893219, 8.87907868), (-24.3, 9.171971899))
        make_face(mode=Mode.SUBTRACT)
    extrude(amount=-CUT_EXTRUDE10_DEPTH, mode=Mode.SUBTRACT)


solid = part_1.part
